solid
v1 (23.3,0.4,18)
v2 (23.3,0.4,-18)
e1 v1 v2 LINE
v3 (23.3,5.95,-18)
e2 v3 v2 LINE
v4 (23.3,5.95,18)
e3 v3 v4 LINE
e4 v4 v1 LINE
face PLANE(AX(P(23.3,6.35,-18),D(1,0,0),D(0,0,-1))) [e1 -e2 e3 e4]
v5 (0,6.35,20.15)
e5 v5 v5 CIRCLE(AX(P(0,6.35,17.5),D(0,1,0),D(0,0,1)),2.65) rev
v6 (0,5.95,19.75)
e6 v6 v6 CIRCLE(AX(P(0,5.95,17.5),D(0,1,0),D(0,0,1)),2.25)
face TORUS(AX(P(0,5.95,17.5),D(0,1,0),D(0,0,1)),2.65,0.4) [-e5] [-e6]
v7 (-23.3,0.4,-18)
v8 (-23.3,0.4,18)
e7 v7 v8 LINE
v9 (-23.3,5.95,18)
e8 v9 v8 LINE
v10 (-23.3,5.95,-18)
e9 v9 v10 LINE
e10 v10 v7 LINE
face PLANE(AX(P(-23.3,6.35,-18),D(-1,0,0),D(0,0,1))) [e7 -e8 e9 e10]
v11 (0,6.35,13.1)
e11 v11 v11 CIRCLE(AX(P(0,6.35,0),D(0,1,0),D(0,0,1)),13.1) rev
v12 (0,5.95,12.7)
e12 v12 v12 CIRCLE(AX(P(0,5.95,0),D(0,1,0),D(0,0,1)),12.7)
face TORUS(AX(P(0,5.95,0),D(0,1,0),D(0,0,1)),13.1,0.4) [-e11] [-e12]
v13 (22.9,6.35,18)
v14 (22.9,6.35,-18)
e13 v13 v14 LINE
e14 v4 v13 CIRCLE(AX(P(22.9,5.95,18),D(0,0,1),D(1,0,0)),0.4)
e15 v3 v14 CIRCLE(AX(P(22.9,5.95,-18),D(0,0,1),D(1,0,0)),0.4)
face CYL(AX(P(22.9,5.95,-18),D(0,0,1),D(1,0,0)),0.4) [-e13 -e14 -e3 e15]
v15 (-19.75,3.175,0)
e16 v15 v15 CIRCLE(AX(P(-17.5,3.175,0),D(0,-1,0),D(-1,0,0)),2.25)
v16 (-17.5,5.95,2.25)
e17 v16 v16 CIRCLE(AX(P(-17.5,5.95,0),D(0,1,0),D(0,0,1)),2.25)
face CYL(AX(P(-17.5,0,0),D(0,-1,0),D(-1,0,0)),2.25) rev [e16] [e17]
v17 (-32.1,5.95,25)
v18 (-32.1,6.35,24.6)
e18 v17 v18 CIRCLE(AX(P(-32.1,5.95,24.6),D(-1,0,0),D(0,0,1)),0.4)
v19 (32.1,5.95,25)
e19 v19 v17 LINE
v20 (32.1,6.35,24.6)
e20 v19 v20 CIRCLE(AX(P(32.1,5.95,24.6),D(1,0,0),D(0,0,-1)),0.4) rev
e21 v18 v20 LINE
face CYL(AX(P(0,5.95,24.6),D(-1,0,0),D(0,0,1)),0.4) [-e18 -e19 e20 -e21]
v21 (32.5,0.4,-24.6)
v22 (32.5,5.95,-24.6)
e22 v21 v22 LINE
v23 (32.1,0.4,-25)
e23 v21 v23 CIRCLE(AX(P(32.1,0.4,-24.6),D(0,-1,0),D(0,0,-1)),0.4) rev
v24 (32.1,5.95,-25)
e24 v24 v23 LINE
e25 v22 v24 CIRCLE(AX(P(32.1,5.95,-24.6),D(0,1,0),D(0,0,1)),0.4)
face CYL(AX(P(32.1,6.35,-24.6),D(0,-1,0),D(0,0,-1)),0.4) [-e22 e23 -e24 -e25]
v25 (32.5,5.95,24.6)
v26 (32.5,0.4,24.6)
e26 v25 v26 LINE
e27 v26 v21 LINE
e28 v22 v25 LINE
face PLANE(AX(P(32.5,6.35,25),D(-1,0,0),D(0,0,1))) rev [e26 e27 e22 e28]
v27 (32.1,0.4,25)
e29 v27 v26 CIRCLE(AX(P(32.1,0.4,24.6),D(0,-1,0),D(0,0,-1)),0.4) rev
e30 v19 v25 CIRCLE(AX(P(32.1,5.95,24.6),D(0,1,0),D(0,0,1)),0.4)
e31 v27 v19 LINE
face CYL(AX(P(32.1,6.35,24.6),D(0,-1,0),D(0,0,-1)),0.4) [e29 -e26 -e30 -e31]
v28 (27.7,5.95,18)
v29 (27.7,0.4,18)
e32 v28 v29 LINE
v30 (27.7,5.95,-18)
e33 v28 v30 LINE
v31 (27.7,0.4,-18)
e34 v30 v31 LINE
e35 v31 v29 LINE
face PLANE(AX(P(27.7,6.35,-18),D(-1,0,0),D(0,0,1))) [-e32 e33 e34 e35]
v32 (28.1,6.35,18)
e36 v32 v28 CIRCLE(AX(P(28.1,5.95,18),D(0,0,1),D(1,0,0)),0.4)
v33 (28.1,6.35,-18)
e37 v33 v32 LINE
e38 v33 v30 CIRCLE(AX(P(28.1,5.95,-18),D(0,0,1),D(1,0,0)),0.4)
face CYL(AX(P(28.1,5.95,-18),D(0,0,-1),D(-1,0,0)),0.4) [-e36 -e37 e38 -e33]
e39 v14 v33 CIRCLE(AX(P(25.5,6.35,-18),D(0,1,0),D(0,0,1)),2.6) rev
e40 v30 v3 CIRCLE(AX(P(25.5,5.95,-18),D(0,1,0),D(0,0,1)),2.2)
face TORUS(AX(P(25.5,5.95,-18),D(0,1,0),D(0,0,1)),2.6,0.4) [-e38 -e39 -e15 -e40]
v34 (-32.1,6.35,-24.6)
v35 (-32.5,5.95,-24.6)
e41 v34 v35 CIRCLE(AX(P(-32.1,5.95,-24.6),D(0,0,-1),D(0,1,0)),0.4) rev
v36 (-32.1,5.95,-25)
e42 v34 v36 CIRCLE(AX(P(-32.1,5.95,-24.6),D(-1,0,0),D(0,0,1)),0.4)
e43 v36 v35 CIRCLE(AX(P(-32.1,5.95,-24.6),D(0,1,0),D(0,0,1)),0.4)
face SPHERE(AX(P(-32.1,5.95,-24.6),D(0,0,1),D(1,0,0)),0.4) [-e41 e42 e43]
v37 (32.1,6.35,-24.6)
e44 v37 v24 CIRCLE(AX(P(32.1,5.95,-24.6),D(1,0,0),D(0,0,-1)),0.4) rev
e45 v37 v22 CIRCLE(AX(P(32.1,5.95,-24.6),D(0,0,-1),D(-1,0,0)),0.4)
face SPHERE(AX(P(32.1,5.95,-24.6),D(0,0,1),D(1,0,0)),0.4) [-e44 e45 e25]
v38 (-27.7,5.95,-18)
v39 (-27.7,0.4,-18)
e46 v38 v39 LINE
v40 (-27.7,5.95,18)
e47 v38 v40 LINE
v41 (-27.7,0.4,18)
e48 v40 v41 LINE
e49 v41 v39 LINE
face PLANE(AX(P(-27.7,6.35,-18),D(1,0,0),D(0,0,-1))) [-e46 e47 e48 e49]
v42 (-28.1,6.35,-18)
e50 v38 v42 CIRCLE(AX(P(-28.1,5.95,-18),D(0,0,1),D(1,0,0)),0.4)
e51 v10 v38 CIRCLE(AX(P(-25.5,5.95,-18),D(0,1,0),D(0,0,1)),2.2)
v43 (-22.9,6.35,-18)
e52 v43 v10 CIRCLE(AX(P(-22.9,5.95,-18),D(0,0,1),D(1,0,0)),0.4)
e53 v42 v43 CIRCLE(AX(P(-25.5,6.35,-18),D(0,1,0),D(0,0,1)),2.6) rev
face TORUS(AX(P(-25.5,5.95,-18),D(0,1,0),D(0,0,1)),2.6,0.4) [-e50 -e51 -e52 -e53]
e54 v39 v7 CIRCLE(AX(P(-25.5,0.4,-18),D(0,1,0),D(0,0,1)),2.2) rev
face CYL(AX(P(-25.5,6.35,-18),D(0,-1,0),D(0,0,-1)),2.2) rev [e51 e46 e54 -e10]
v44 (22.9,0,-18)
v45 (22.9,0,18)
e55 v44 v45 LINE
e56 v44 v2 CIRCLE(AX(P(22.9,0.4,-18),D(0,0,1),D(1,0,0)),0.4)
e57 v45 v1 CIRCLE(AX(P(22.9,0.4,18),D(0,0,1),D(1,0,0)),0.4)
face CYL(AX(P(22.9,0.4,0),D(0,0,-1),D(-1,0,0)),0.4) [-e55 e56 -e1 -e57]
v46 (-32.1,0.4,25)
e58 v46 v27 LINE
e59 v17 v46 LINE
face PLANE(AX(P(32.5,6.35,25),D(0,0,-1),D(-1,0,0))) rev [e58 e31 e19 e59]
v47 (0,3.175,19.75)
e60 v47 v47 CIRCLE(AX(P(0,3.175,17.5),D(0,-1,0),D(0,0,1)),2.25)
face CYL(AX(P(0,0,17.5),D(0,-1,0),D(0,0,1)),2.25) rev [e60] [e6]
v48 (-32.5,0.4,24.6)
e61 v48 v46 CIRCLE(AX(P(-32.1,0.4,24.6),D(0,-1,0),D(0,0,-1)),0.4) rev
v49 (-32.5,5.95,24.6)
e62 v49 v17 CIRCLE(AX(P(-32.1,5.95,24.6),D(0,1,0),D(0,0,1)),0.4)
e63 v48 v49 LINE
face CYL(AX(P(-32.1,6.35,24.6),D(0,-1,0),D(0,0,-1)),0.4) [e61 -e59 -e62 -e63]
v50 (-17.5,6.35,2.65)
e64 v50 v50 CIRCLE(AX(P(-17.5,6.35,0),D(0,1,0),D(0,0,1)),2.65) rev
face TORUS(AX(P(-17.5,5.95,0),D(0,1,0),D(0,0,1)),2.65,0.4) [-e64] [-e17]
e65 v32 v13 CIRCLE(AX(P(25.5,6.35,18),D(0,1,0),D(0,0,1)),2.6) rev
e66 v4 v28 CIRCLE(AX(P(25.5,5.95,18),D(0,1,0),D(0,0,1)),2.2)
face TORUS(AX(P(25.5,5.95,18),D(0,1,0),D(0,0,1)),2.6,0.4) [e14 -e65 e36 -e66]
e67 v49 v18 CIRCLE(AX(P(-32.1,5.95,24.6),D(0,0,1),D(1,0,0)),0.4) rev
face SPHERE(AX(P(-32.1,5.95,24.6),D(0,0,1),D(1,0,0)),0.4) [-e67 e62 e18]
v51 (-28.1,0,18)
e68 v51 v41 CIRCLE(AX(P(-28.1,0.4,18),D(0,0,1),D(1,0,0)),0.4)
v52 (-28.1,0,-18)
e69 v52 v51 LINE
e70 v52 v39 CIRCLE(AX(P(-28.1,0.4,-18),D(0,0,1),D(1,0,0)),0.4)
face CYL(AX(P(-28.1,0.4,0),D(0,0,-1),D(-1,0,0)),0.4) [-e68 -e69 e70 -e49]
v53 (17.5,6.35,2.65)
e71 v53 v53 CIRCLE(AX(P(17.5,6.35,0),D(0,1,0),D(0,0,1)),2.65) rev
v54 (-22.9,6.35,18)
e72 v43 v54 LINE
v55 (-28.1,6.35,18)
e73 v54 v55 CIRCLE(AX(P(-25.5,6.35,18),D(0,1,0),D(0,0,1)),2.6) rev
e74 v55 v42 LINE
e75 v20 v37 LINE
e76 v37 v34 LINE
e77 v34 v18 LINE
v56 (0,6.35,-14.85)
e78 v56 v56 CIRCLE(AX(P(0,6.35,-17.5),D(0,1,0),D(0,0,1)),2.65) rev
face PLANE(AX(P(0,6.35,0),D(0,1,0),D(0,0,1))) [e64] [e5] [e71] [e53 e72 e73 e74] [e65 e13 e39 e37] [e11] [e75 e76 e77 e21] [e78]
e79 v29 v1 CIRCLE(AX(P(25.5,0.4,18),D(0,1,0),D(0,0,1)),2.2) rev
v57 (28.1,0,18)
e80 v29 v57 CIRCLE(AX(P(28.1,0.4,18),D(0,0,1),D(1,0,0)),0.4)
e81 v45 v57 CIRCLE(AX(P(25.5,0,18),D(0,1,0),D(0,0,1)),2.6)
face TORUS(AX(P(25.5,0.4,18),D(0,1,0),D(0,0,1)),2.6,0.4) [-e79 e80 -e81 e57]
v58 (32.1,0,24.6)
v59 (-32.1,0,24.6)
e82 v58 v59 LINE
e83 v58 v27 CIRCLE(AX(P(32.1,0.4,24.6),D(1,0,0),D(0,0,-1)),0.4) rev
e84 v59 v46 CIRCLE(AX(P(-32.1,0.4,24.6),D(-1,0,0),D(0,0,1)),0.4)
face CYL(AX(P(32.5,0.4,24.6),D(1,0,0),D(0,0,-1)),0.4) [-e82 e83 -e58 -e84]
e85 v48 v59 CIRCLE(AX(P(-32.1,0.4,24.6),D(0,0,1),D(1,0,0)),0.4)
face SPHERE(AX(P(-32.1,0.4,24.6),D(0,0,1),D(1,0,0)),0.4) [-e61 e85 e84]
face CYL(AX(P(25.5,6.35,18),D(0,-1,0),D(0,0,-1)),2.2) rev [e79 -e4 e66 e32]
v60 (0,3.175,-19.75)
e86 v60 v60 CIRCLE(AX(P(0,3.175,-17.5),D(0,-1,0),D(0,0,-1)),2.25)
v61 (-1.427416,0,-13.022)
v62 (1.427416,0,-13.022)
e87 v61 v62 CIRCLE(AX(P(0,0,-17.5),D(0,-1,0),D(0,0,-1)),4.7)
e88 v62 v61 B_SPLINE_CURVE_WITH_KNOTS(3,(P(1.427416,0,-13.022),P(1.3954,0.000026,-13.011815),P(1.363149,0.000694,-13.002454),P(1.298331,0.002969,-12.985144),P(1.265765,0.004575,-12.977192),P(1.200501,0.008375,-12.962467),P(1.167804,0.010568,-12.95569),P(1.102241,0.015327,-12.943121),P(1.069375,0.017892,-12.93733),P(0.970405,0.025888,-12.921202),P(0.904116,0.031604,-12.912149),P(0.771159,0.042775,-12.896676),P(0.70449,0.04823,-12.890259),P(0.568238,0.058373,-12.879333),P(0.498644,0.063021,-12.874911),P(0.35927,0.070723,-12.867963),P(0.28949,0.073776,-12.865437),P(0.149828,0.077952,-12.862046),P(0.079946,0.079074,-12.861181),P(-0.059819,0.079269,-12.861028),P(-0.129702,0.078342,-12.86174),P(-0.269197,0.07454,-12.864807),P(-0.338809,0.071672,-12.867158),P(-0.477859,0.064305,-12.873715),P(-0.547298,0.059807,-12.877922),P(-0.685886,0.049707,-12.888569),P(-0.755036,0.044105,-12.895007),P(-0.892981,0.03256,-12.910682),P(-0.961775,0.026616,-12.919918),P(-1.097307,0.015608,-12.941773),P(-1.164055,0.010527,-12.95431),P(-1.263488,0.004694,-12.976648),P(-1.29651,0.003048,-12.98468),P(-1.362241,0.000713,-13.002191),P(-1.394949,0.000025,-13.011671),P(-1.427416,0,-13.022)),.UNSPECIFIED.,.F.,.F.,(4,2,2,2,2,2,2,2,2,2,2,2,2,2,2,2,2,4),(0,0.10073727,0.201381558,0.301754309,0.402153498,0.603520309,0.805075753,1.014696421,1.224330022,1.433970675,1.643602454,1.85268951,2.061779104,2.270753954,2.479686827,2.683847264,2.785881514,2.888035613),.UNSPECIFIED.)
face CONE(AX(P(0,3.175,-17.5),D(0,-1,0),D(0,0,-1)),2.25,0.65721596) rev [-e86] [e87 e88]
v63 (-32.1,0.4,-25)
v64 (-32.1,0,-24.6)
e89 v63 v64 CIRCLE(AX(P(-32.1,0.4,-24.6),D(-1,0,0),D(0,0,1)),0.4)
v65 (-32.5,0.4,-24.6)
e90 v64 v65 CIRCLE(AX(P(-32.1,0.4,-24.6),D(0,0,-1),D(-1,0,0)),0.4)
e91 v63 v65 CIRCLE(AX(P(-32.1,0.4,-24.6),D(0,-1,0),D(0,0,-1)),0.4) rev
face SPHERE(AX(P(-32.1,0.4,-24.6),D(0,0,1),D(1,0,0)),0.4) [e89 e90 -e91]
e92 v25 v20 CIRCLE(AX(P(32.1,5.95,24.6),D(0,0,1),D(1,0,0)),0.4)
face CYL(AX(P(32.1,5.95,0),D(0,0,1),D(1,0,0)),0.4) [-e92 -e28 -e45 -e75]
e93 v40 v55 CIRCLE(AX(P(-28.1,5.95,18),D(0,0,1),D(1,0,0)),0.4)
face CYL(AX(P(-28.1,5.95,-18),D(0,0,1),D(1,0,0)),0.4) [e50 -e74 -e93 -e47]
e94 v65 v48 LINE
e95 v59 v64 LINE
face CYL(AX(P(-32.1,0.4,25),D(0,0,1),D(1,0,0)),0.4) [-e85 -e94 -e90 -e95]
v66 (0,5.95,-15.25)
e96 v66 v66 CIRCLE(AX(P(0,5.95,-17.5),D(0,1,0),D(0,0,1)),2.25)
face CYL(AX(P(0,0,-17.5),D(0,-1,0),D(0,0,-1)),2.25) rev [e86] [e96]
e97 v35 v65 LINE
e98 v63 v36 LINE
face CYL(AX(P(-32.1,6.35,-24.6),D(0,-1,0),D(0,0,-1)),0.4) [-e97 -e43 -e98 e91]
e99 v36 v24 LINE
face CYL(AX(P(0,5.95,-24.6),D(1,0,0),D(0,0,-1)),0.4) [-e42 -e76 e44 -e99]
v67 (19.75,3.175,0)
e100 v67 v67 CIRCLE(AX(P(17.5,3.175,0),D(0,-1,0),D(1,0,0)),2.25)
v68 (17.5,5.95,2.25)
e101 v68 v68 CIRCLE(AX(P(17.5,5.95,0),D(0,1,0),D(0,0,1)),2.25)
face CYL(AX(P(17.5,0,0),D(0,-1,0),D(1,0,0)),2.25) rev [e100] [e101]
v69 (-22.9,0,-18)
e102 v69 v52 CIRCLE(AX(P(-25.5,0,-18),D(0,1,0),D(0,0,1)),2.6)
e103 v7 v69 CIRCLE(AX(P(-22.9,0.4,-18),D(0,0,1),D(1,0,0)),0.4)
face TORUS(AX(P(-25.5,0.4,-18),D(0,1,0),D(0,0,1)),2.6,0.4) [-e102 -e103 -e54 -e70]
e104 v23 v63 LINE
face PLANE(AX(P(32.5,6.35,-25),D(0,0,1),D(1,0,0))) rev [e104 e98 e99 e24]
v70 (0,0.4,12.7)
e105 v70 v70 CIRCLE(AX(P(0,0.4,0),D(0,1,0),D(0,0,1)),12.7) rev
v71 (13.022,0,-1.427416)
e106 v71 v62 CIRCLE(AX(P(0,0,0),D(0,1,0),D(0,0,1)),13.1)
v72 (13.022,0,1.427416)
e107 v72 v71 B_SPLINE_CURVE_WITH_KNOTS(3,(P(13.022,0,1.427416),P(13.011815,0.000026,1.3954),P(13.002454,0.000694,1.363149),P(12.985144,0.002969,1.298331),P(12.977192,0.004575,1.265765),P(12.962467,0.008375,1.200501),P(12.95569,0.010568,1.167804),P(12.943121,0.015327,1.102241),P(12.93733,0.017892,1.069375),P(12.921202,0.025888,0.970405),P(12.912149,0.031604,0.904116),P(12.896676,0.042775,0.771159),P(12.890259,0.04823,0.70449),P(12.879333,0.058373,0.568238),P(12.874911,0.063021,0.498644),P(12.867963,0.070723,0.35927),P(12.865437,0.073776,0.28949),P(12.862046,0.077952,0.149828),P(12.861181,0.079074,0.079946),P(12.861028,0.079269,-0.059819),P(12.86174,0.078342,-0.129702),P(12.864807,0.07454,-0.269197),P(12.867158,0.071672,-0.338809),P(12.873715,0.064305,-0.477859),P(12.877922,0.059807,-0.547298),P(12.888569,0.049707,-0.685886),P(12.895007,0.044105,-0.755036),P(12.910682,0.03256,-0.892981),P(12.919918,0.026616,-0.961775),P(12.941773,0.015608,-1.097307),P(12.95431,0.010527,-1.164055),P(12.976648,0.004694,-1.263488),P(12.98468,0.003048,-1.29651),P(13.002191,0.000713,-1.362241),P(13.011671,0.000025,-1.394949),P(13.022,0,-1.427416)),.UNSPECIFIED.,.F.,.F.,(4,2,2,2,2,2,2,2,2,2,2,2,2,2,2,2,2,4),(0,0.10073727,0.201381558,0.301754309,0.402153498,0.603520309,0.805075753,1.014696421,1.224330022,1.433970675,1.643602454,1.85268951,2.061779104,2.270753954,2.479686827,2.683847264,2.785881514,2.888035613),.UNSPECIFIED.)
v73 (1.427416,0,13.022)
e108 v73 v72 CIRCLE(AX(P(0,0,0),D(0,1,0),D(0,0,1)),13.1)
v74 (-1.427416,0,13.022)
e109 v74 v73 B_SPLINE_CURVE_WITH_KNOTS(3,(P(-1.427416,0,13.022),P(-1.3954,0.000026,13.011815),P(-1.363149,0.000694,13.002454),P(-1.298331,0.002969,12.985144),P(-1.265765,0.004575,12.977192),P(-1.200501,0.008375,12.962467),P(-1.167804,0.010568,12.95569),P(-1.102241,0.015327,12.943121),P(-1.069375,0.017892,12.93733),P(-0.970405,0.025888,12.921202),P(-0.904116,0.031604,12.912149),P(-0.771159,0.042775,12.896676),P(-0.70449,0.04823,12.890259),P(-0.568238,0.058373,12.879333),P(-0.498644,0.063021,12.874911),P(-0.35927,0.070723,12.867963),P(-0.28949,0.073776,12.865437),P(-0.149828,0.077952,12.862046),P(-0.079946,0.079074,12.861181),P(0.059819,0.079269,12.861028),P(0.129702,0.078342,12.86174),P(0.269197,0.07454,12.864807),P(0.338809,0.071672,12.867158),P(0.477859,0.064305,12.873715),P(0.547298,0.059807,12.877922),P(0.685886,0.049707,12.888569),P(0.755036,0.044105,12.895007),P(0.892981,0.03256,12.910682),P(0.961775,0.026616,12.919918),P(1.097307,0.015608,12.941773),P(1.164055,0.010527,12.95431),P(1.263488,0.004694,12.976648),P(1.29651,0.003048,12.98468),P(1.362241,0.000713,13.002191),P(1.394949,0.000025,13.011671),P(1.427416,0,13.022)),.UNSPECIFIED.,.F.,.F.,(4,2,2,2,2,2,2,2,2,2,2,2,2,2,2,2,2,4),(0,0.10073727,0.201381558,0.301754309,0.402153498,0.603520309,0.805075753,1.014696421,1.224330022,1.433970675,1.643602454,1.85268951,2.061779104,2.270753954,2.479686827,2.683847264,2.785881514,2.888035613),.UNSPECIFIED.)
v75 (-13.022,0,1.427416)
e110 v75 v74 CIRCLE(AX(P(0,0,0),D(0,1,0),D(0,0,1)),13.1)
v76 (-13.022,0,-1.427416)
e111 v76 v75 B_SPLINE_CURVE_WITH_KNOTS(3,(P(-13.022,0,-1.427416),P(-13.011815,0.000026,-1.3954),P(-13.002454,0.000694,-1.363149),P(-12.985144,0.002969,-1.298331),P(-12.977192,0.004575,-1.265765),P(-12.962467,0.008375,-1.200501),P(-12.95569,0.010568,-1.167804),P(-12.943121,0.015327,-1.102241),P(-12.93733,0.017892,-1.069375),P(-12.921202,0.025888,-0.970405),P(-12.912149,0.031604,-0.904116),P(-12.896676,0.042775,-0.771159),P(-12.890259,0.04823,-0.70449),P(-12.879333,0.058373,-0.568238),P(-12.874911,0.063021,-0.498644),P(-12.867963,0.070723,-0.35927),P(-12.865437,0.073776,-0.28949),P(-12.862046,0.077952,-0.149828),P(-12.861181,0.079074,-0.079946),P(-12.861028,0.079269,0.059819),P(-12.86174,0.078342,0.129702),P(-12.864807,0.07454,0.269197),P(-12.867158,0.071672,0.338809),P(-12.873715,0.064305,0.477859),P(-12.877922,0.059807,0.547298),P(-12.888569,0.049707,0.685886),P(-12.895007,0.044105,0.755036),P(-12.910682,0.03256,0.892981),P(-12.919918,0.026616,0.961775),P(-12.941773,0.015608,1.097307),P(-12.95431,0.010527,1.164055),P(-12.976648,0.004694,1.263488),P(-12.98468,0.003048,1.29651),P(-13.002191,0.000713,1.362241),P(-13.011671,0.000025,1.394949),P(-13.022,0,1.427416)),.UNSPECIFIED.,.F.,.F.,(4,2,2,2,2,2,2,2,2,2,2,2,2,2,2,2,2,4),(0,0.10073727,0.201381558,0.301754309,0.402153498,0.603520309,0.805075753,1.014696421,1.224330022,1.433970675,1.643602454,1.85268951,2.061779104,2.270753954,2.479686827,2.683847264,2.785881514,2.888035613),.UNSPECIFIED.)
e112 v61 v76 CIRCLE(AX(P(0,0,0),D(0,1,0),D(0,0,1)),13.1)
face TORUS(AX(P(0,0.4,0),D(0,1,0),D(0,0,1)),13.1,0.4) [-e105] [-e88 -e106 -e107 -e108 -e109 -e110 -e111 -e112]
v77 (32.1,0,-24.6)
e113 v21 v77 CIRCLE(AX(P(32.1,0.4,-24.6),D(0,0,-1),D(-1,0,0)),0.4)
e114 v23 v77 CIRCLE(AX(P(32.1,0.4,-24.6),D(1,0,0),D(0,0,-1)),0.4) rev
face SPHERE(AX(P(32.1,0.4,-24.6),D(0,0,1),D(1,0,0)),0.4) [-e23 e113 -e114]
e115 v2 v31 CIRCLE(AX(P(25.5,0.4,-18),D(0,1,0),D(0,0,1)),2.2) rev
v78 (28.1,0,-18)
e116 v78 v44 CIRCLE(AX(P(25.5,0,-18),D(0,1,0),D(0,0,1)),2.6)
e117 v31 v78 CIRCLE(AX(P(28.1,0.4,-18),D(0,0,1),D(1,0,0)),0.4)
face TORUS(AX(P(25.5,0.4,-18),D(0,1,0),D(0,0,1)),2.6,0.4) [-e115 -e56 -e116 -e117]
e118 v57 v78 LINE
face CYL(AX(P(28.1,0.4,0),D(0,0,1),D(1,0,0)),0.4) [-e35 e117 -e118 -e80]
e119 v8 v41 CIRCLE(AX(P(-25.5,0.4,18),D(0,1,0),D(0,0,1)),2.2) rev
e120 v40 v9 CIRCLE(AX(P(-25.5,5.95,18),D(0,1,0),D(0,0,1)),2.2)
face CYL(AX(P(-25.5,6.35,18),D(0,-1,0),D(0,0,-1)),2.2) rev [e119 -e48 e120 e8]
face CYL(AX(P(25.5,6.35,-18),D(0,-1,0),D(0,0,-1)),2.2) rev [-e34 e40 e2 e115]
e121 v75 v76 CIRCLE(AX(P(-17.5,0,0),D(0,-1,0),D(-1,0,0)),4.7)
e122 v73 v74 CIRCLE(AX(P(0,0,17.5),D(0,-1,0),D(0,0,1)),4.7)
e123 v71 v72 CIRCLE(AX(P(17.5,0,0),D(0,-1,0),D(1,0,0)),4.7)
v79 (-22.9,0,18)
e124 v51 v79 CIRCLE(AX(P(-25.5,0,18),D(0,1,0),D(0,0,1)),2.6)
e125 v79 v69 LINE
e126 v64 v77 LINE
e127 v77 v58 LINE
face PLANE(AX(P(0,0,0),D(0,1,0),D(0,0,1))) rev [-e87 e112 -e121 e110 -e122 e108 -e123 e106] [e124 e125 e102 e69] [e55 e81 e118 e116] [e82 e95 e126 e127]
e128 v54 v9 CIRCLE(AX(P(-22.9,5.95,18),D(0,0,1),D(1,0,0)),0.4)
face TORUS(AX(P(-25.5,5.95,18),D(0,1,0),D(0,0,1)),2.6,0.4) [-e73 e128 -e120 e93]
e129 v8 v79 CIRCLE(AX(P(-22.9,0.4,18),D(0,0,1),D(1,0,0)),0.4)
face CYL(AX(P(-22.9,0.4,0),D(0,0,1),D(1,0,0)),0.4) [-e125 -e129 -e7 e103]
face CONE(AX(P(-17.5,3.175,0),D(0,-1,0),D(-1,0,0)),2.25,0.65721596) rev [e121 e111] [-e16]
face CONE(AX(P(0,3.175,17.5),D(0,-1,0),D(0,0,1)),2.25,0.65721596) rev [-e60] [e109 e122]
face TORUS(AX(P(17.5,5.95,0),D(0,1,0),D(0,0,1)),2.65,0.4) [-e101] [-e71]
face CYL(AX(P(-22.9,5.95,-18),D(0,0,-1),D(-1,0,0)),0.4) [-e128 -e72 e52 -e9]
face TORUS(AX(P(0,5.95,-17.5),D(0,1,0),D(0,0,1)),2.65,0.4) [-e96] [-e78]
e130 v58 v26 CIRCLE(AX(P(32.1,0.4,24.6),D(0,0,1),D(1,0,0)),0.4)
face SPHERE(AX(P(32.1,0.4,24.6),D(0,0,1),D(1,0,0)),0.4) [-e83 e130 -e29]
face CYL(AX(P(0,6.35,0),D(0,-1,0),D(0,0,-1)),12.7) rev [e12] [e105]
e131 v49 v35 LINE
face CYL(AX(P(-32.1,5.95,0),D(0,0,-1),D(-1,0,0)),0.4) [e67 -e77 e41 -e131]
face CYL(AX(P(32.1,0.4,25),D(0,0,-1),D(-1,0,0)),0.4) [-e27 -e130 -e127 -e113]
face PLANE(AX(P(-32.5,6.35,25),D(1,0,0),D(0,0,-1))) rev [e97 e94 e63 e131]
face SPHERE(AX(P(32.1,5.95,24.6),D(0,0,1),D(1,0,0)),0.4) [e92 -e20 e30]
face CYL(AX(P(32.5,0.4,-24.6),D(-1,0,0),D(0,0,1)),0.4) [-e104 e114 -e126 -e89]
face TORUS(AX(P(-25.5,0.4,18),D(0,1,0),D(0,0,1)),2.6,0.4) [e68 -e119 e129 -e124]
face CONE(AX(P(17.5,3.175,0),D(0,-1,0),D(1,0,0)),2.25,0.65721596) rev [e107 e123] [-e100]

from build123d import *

# Parameters (mm, degrees)
SKETCH2_W           = 65
SKETCH2_H           = 50
SKETCH2_R           = 12.7
BOSS_EXTRUDE1_DEPTH = 6.35
CIRPATTERN1_COUNT   = 4
FILLET1_R           = 0.4


with BuildPart() as part:
    # Sketch2 → Boss-Extrude1 (new body)
    with BuildSketch(Plane(origin=(0, 0, 0), x_dir=(1, 0, 0), z_dir=(0, 1, 0))):
        Rectangle(SKETCH2_W, SKETCH2_H)
        with Locations(Location((0, 0, 0), (0, 0, 270))):
            Circle(SKETCH2_R, mode=Mode.SUBTRACT)
        with BuildLine():
            Line((-23.3, 18), (-23.3, -18))
            ThreePointArc((-23.3, -18), (-25.5, -20.2), (-27.7, -18))
            Line((-27.7, -18), (-27.7, 18))
            ThreePointArc((-27.7, 18), (-25.5, 20.2), (-23.3, 18))
        make_face(mode=Mode.SUBTRACT)
        with BuildLine():
            Line((23.3, 18), (23.3, -18))
            ThreePointArc((23.3, -18), (25.5, -20.2), (27.7, -18))
            Line((27.7, -18), (27.7, 18))
            ThreePointArc((27.7, 18), (25.5, 20.2), (23.3, 18))
        make_face(mode=Mode.SUBTRACT)
    extrude(amount=BOSS_EXTRUDE1_DEPTH)

    # Sketch3 → Cut-Revolve1 (revolve, cut)
    with BuildSketch(Plane(origin=(0, 0, 0), x_dir=(0, 0, -1), z_dir=(1, 0, 0)), mode=Mode.PRIVATE) as cut_revolve1_sk:
        Polygon((12.8, 0), (17.5, 0), (17.5, 6.35), (15.25, 6.35), (15.25, 3.175), align=None)
    cut_revolve1 = revolve(cut_revolve1_sk.sketch.rotate(Axis((0, 0, -17.5), (0, 1, 0)), 180), axis=Axis((0, 0, -17.5), (0, 1, 0)), mode=Mode.SUBTRACT)

    # CirPattern1: Cut-Revolve1 ×4 about axis
    cirpattern1_axis = Axis((0, 0, 0), (0, 1, 0))
    for i in range(1, CIRPATTERN1_COUNT):
        add(cut_revolve1.rotate(cirpattern1_axis, i * 360 / CIRPATTERN1_COUNT), mode=Mode.SUBTRACT)

    # Fillet1
    # the kernel refuses this fillet: 0.4 mm, written as the material it takes off along each edge
    with BuildSketch(Plane(origin=(32.1, 5.95, -24.6), x_dir=(0, 1, 0), z_dir=(1, 0, 0))) as fillet1_piece_1_section:
        Polygon((0, 0), (FILLET1_R, 0), (FILLET1_R, -FILLET1_R), (0, -FILLET1_R), align=None)
    fillet1_piece_1 = extrude(amount=FILLET1_R, mode=Mode.PRIVATE)
    fillet1_piece_1 = fillet1_piece_1 - Plane(origin=(32.1, 5.95, -24.6), x_dir=(0, -0.7071067811865475, 0.7071067811865475), z_dir=(1, 0, 0)) * Sphere(FILLET1_R, mode=Mode.PRIVATE)
    add(fillet1_piece_1, mode=Mode.SUBTRACT)
    with BuildSketch(Plane(origin=(32.1, 5.95, 24.6), x_dir=(1, 0, 0), z_dir=(0, 0, 1))) as fillet1_piece_2_section:
        Polygon((0, 0), (FILLET1_R, 0), (FILLET1_R, FILLET1_R), (0, FILLET1_R), align=None)
    fillet1_piece_2 = extrude(amount=FILLET1_R, mode=Mode.PRIVATE)
    fillet1_piece_2 = fillet1_piece_2 - Plane(origin=(32.1, 5.95, 24.6), x_dir=(-0.7071067811865475, -0.7071067811865475, 0), z_dir=(0, 0, 1)) * Sphere(FILLET1_R, mode=Mode.PRIVATE)
    add(fillet1_piece_2, mode=Mode.SUBTRACT)
    with BuildSketch(Plane(origin=(-32.1, 5.95, -24.6), x_dir=(0, 1, 0), z_dir=(-1, 0, 0))) as fillet1_piece_3_section:
        Polygon((0, 0), (FILLET1_R, 0), (FILLET1_R, FILLET1_R), (0, FILLET1_R), align=None)
    fillet1_piece_3 = extrude(amount=FILLET1_R, mode=Mode.PRIVATE)
    fillet1_piece_3 = fillet1_piece_3 - Plane(origin=(-32.1, 5.95, -24.6), x_dir=(0, -0.7071067811865475, 0.7071067811865475), z_dir=(-1, 0, 0)) * Sphere(FILLET1_R, mode=Mode.PRIVATE)
    add(fillet1_piece_3, mode=Mode.SUBTRACT)
    with BuildSketch(Plane(origin=(-32.1, 5.95, 24.6), x_dir=(-1, 0, 0), z_dir=(0, 0, 1))) as fillet1_piece_4_section:
        Polygon((0, 0), (FILLET1_R, 0), (FILLET1_R, -FILLET1_R), (0, -FILLET1_R), align=None)
    fillet1_piece_4 = extrude(amount=FILLET1_R, mode=Mode.PRIVATE)
    fillet1_piece_4 = fillet1_piece_4 - Plane(origin=(-32.1, 5.95, 24.6), x_dir=(0.7071067811865475, -0.7071067811865475, 0), z_dir=(0, 0, 1)) * Sphere(FILLET1_R, mode=Mode.PRIVATE)
    add(fillet1_piece_4, mode=Mode.SUBTRACT)
    with BuildSketch(Plane(origin=(-32.1, 0.4, -24.6), x_dir=(0, -1, 0), z_dir=(-1, 0, 0))) as fillet1_piece_5_section:
        Polygon((0, 0), (FILLET1_R, 0), (FILLET1_R, -FILLET1_R), (0, -FILLET1_R), align=None)
    fillet1_piece_5 = extrude(amount=FILLET1_R, mode=Mode.PRIVATE)
    fillet1_piece_5 = fillet1_piece_5 - Plane(origin=(-32.1, 0.4, -24.6), x_dir=(0, 0.7071067811865475, 0.7071067811865475), z_dir=(-1, 0, 0)) * Sphere(FILLET1_R, mode=Mode.PRIVATE)
    add(fillet1_piece_5, mode=Mode.SUBTRACT)
    with BuildSketch(Plane(origin=(32.1, 0.4, -24.6), x_dir=(0, -1, 0), z_dir=(1, 0, 0))) as fillet1_piece_6_section:
        Polygon((0, 0), (FILLET1_R, 0), (FILLET1_R, FILLET1_R), (0, FILLET1_R), align=None)
    fillet1_piece_6 = extrude(amount=FILLET1_R, mode=Mode.PRIVATE)
    fillet1_piece_6 = fillet1_piece_6 - Plane(origin=(32.1, 0.4, -24.6), x_dir=(0, 0.7071067811865475, 0.7071067811865475), z_dir=(1, 0, 0)) * Sphere(FILLET1_R, mode=Mode.PRIVATE)
    add(fillet1_piece_6, mode=Mode.SUBTRACT)
    with BuildSketch(Plane(origin=(32.1, 0.4, 24.6), x_dir=(1, 0, 0), z_dir=(0, 0, 1))) as fillet1_piece_7_section:
        Polygon((0, 0), (FILLET1_R, 0), (FILLET1_R, -FILLET1_R), (0, -FILLET1_R), align=None)
    fillet1_piece_7 = extrude(amount=FILLET1_R, mode=Mode.PRIVATE)
    fillet1_piece_7 = fillet1_piece_7 - Plane(origin=(32.1, 0.4, 24.6), x_dir=(-0.7071067811865475, 0.7071067811865475, 0), z_dir=(0, 0, 1)) * Sphere(FILLET1_R, mode=Mode.PRIVATE)
    add(fillet1_piece_7, mode=Mode.SUBTRACT)
    with BuildSketch(Plane(origin=(-32.1, 0.4, 24.6), x_dir=(-1, 0, 0), z_dir=(0, 0, 1))) as fillet1_piece_8_section:
        Polygon((0, 0), (FILLET1_R, 0), (FILLET1_R, FILLET1_R), (0, FILLET1_R), align=None)
    fillet1_piece_8 = extrude(amount=FILLET1_R, mode=Mode.PRIVATE)
    fillet1_piece_8 = fillet1_piece_8 - Plane(origin=(-32.1, 0.4, 24.6), x_dir=(0.7071067811865475, 0.7071067811865475, 0), z_dir=(0, 0, 1)) * Sphere(FILLET1_R, mode=Mode.PRIVATE)
    add(fillet1_piece_8, mode=Mode.SUBTRACT)
    with BuildSketch(Plane(origin=(32.5, 6.35, -24.6), x_dir=(0, -1, 0), z_dir=(0, 0, 1)), Plane(origin=(-32.5, 6.35, 24.6), x_dir=(0, -1, 0), z_dir=(0, 0, -1))) as fillet1_piece_9:
        with BuildLine():
            CenterArc((FILLET1_R, -FILLET1_R), FILLET1_R, 90, 90)
            Line((0, -FILLET1_R), (0, 0))
            Line((0, 0), (FILLET1_R, 0))
        make_face()
    extrude(amount=49.2, mode=Mode.SUBTRACT)
    with BuildSketch(Plane(origin=(-32.1, 6.35, -25), x_dir=(0, 0, 1), z_dir=(1, 0, 0)), Plane(origin=(32.1, 0, 25), x_dir=(0, 1, 0), z_dir=(-1, 0, 0))) as fillet1_piece_10:
        with BuildLine():
            CenterArc((FILLET1_R, FILLET1_R), FILLET1_R, 180, 90)
            Line((0, FILLET1_R), (0, 0))
            Line((0, 0), (FILLET1_R, 0))
        make_face()
    extrude(amount=64.2, mode=Mode.SUBTRACT)
    with BuildSketch(Plane(origin=(-25.5, 0, -18), x_dir=(-1, 0, 0), z_dir=(0, 0, 1))) as fillet1_piece_11:
        with BuildLine():
            CenterArc((2.2 + FILLET1_R, -FILLET1_R), FILLET1_R, 90, 90)
            Line((2.2, -FILLET1_R), (2.2, 0))
            Line((2.2, 0), (2.2 + FILLET1_R, 0))
        make_face()
    revolve(axis=Axis((-25.5, 0, -18), (0, -1, 0)), revolution_arc=180, mode=Mode.SUBTRACT)
    with BuildSketch(Plane(origin=(-27.7, 0, 18), x_dir=(-1, 0, 0), z_dir=(0, 0, -1)), Plane(origin=(-23.3, 0, -18), x_dir=(1, 0, 0), z_dir=(0, 0, 1)), Plane(origin=(23.3, 6.35, -18), x_dir=(-1, 0, 0), z_dir=(0, 0, 1)), Plane(origin=(27.7, 6.35, 18), x_dir=(1, 0, 0), z_dir=(0, 0, -1))) as fillet1_piece_12:
        with BuildLine():
            CenterArc((FILLET1_R, FILLET1_R), FILLET1_R, 180, 90)
            Line((0, FILLET1_R), (0, 0))
            Line((0, 0), (FILLET1_R, 0))
        make_face()
    extrude(amount=36, mode=Mode.SUBTRACT)
    with BuildSketch(Plane(origin=(-25.5, 0, 18), x_dir=(1, 0, 0), z_dir=(0, 0, -1))) as fillet1_piece_13:
        with BuildLine():
            CenterArc((2.2 + FILLET1_R, -FILLET1_R), FILLET1_R, 90, 90)
            Line((2.2, -FILLET1_R), (2.2, 0))
            Line((2.2, 0), (2.2 + FILLET1_R, 0))
        make_face()
    revolve(axis=Axis((-25.5, 0, 18), (0, -1, 0)), revolution_arc=180, mode=Mode.SUBTRACT)
    with BuildSketch(Plane(origin=(-25.5, 6.35, -18), x_dir=(-1, 0, 0), z_dir=(0, 0, 1))) as fillet1_piece_14:
        with BuildLine():
            CenterArc((2.2 + FILLET1_R, FILLET1_R), FILLET1_R, 180, 90)
            Line((2.2, FILLET1_R), (2.2, 0))
            Line((2.2, 0), (2.2 + FILLET1_R, 0))
        make_face()
    revolve(axis=Axis((-25.5, 6.35, -18), (0, -1, 0)), revolution_arc=180, mode=Mode.SUBTRACT)
    with BuildSketch(Plane(origin=(-27.7, 6.35, 18), x_dir=(-1, 0, 0), z_dir=(0, 0, -1)), Plane(origin=(-23.3, 6.35, -18), x_dir=(1, 0, 0), z_dir=(0, 0, 1)), Plane(origin=(23.3, 0, -18), x_dir=(-1, 0, 0), z_dir=(0, 0, 1)), Plane(origin=(27.7, 0, 18), x_dir=(1, 0, 0), z_dir=(0, 0, -1))) as fillet1_piece_15:
        with BuildLine():
            CenterArc((FILLET1_R, -FILLET1_R), FILLET1_R, 90, 90)
            Line((0, -FILLET1_R), (0, 0))
            Line((0, 0), (FILLET1_R, 0))
        make_face()
    extrude(amount=36, mode=Mode.SUBTRACT)
    with BuildSketch(Plane(origin=(-25.5, 6.35, 18), x_dir=(1, 0, 0), z_dir=(0, 0, -1))) as fillet1_piece_16:
        with BuildLine():
            CenterArc((2.2 + FILLET1_R, FILLET1_R), FILLET1_R, 180, 90)
            Line((2.2, FILLET1_R), (2.2, 0))
            Line((2.2, 0), (2.2 + FILLET1_R, 0))
        make_face()
    revolve(axis=Axis((-25.5, 6.35, 18), (0, -1, 0)), revolution_arc=180, mode=Mode.SUBTRACT)
    with BuildSketch(Plane(origin=(0, 0, 0), x_dir=(0, 0, 1), z_dir=(-1, 0, 0))) as fillet1_piece_17:
        with BuildLine():
            CenterArc((12.7 + FILLET1_R, FILLET1_R), FILLET1_R, 180, 90)
            Line((12.7, FILLET1_R), (12.7, 0))
            Line((12.7, 0), (12.7 + FILLET1_R, 0))
        make_face()
    revolve(axis=Axis((0, 0, 0), (0, 1, 0)), mode=Mode.SUBTRACT)
    with BuildSketch(Plane(origin=(0, 6.35, 0), x_dir=(0, 0, 1), z_dir=(-1, 0, 0))) as fillet1_piece_18:
        with BuildLine():
            CenterArc((12.7 + FILLET1_R, -FILLET1_R), FILLET1_R, 90, 90)
            Line((12.7, -FILLET1_R), (12.7, 0))
            Line((12.7, 0), (12.7 + FILLET1_R, 0))
        make_face()
    revolve(axis=Axis((0, 6.35, 0), (0, 1, 0)), mode=Mode.SUBTRACT)
    with BuildSketch(Plane(origin=(25.5, 0, -18), x_dir=(1, 0, 0), z_dir=(0, 0, 1))) as fillet1_piece_19:
        with BuildLine():
            CenterArc((2.2 + FILLET1_R, FILLET1_R), FILLET1_R, 180, 90)
            Line((2.2, FILLET1_R), (2.2, 0))
            Line((2.2, 0), (2.2 + FILLET1_R, 0))
        make_face()
    revolve(axis=Axis((25.5, 0, -18), (0, 1, 0)), revolution_arc=180, mode=Mode.SUBTRACT)
    with BuildSketch(Plane(origin=(25.5, 0, 18), x_dir=(-1, 0, 0), z_dir=(0, 0, -1))) as fillet1_piece_20:
        with BuildLine():
            CenterArc((2.2 + FILLET1_R, FILLET1_R), FILLET1_R, 180, 90)
            Line((2.2, FILLET1_R), (2.2, 0))
            Line((2.2, 0), (2.2 + FILLET1_R, 0))
        make_face()
    revolve(axis=Axis((25.5, 0, 18), (0, 1, 0)), revolution_arc=180, mode=Mode.SUBTRACT)
    with BuildSketch(Plane(origin=(25.5, 6.35, -18), x_dir=(1, 0, 0), z_dir=(0, 0, 1))) as fillet1_piece_21:
        with BuildLine():
            CenterArc((2.2 + FILLET1_R, -FILLET1_R), FILLET1_R, 90, 90)
            Line((2.2, -FILLET1_R), (2.2, 0))
            Line((2.2, 0), (2.2 + FILLET1_R, 0))
        make_face()
    revolve(axis=Axis((25.5, 6.35, -18), (0, 1, 0)), revolution_arc=180, mode=Mode.SUBTRACT)
    with BuildSketch(Plane(origin=(25.5, 6.35, 18), x_dir=(-1, 0, 0), z_dir=(0, 0, -1))) as fillet1_piece_22:
        with BuildLine():
            CenterArc((2.2 + FILLET1_R, -FILLET1_R), FILLET1_R, 90, 90)
            Line((2.2, -FILLET1_R), (2.2, 0))
            Line((2.2, 0), (2.2 + FILLET1_R, 0))
        make_face()
    revolve(axis=Axis((25.5, 6.35, 18), (0, 1, 0)), revolution_arc=180, mode=Mode.SUBTRACT)
    with BuildSketch(Plane(origin=(-32.1, 0, -25), x_dir=(0, 0, 1), z_dir=(1, 0, 0)), Plane(origin=(32.1, 6.35, 25), x_dir=(0, -1, 0), z_dir=(-1, 0, 0))) as fillet1_piece_23:
        with BuildLine():
            CenterArc((FILLET1_R, -FILLET1_R), FILLET1_R, 90, 90)
            Line((0, -FILLET1_R), (0, 0))
            Line((0, 0), (FILLET1_R, 0))
        make_face()
    extrude(amount=64.2, mode=Mode.SUBTRACT)
    with BuildSketch(Plane(origin=(0, 6.35, -17.5), x_dir=(0, 0, -1), z_dir=(1, 0, 0))) as fillet1_piece_24:
        with BuildLine():
            CenterArc((2.25 + FILLET1_R, -FILLET1_R), FILLET1_R, 90, 90)
            Line((2.25, -FILLET1_R), (2.25, 0))
            Line((2.25, 0), (2.25 + FILLET1_R, 0))
        make_face()
    revolve(axis=Axis((0, 6.35, -17.5), (0, 1, 0)), mode=Mode.SUBTRACT)
    with BuildSketch(Plane(origin=(32.5, 0, -24.6), x_dir=(0, 1, 0), z_dir=(0, 0, 1)), Plane(origin=(-32.5, 0, 24.6), x_dir=(0, 1, 0), z_dir=(0, 0, -1))) as fillet1_piece_25:
        with BuildLine():
            CenterArc((FILLET1_R, FILLET1_R), FILLET1_R, 180, 90)
            Line((0, FILLET1_R), (0, 0))
            Line((0, 0), (FILLET1_R, 0))
        make_face()
    extrude(amount=49.2, mode=Mode.SUBTRACT)
    with BuildSketch(Plane(origin=(-17.5, 6.35, 0), x_dir=(-1, 0, 0), z_dir=(0, 0, -1))) as fillet1_piece_26:
        with BuildLine():
            CenterArc((2.25 + FILLET1_R, -FILLET1_R), FILLET1_R, 90, 90)
            Line((2.25, -FILLET1_R), (2.25, 0))
            Line((2.25, 0), (2.25 + FILLET1_R, 0))
        make_face()
    revolve(axis=Axis((-17.5, 6.35, 0), (0, 1, 0)), mode=Mode.SUBTRACT)
    with BuildSketch(Plane(origin=(0, 6.35, 17.5), x_dir=(0, 0, 1), z_dir=(-1, 0, 0))) as fillet1_piece_27:
        with BuildLine():
            CenterArc((2.25 + FILLET1_R, -FILLET1_R), FILLET1_R, 90, 90)
            Line((2.25, -FILLET1_R), (2.25, 0))
            Line((2.25, 0), (2.25 + FILLET1_R, 0))
        make_face()
    revolve(axis=Axis((0, 6.35, 17.5), (0, 1, 0)), mode=Mode.SUBTRACT)
    with BuildSketch(Plane(origin=(17.5, 6.35, 0), x_dir=(1, 0, 0), z_dir=(0, 0, 1))) as fillet1_piece_28:
        with BuildLine():
            CenterArc((2.25 + FILLET1_R, -FILLET1_R), FILLET1_R, 90, 90)
            Line((2.25, -FILLET1_R), (2.25, 0))
            Line((2.25, 0), (2.25 + FILLET1_R, 0))
        make_face()
    revolve(axis=Axis((17.5, 6.35, 0), (0, 1, 0)), mode=Mode.SUBTRACT)
    with BuildSketch(Plane(origin=(-32.5, 0.4, -25), x_dir=(0, 0, 1), z_dir=(0, 1, 0)), Plane(origin=(-32.5, 0.4, 25), x_dir=(1, 0, 0), z_dir=(0, 1, 0))) as fillet1_piece_29:
        with BuildLine():
            CenterArc((FILLET1_R, FILLET1_R), FILLET1_R, 180, 90)
            Line((0, FILLET1_R), (0, 0))
            Line((0, 0), (FILLET1_R, 0))
        make_face()
    extrude(amount=5.55, mode=Mode.SUBTRACT)
    with BuildSketch(Plane(origin=(32.5, 0.4, -25), x_dir=(0, 0, 1), z_dir=(0, 1, 0)), Plane(origin=(32.5, 0.4, 25), x_dir=(-1, 0, 0), z_dir=(0, 1, 0))) as fillet1_piece_30:
        with BuildLine():
            CenterArc((FILLET1_R, -FILLET1_R), FILLET1_R, 90, 90)
            Line((0, -FILLET1_R), (0, 0))
            Line((0, 0), (FILLET1_R, 0))
        make_face()
    extrude(amount=5.55, mode=Mode.SUBTRACT)


solid = part.part
